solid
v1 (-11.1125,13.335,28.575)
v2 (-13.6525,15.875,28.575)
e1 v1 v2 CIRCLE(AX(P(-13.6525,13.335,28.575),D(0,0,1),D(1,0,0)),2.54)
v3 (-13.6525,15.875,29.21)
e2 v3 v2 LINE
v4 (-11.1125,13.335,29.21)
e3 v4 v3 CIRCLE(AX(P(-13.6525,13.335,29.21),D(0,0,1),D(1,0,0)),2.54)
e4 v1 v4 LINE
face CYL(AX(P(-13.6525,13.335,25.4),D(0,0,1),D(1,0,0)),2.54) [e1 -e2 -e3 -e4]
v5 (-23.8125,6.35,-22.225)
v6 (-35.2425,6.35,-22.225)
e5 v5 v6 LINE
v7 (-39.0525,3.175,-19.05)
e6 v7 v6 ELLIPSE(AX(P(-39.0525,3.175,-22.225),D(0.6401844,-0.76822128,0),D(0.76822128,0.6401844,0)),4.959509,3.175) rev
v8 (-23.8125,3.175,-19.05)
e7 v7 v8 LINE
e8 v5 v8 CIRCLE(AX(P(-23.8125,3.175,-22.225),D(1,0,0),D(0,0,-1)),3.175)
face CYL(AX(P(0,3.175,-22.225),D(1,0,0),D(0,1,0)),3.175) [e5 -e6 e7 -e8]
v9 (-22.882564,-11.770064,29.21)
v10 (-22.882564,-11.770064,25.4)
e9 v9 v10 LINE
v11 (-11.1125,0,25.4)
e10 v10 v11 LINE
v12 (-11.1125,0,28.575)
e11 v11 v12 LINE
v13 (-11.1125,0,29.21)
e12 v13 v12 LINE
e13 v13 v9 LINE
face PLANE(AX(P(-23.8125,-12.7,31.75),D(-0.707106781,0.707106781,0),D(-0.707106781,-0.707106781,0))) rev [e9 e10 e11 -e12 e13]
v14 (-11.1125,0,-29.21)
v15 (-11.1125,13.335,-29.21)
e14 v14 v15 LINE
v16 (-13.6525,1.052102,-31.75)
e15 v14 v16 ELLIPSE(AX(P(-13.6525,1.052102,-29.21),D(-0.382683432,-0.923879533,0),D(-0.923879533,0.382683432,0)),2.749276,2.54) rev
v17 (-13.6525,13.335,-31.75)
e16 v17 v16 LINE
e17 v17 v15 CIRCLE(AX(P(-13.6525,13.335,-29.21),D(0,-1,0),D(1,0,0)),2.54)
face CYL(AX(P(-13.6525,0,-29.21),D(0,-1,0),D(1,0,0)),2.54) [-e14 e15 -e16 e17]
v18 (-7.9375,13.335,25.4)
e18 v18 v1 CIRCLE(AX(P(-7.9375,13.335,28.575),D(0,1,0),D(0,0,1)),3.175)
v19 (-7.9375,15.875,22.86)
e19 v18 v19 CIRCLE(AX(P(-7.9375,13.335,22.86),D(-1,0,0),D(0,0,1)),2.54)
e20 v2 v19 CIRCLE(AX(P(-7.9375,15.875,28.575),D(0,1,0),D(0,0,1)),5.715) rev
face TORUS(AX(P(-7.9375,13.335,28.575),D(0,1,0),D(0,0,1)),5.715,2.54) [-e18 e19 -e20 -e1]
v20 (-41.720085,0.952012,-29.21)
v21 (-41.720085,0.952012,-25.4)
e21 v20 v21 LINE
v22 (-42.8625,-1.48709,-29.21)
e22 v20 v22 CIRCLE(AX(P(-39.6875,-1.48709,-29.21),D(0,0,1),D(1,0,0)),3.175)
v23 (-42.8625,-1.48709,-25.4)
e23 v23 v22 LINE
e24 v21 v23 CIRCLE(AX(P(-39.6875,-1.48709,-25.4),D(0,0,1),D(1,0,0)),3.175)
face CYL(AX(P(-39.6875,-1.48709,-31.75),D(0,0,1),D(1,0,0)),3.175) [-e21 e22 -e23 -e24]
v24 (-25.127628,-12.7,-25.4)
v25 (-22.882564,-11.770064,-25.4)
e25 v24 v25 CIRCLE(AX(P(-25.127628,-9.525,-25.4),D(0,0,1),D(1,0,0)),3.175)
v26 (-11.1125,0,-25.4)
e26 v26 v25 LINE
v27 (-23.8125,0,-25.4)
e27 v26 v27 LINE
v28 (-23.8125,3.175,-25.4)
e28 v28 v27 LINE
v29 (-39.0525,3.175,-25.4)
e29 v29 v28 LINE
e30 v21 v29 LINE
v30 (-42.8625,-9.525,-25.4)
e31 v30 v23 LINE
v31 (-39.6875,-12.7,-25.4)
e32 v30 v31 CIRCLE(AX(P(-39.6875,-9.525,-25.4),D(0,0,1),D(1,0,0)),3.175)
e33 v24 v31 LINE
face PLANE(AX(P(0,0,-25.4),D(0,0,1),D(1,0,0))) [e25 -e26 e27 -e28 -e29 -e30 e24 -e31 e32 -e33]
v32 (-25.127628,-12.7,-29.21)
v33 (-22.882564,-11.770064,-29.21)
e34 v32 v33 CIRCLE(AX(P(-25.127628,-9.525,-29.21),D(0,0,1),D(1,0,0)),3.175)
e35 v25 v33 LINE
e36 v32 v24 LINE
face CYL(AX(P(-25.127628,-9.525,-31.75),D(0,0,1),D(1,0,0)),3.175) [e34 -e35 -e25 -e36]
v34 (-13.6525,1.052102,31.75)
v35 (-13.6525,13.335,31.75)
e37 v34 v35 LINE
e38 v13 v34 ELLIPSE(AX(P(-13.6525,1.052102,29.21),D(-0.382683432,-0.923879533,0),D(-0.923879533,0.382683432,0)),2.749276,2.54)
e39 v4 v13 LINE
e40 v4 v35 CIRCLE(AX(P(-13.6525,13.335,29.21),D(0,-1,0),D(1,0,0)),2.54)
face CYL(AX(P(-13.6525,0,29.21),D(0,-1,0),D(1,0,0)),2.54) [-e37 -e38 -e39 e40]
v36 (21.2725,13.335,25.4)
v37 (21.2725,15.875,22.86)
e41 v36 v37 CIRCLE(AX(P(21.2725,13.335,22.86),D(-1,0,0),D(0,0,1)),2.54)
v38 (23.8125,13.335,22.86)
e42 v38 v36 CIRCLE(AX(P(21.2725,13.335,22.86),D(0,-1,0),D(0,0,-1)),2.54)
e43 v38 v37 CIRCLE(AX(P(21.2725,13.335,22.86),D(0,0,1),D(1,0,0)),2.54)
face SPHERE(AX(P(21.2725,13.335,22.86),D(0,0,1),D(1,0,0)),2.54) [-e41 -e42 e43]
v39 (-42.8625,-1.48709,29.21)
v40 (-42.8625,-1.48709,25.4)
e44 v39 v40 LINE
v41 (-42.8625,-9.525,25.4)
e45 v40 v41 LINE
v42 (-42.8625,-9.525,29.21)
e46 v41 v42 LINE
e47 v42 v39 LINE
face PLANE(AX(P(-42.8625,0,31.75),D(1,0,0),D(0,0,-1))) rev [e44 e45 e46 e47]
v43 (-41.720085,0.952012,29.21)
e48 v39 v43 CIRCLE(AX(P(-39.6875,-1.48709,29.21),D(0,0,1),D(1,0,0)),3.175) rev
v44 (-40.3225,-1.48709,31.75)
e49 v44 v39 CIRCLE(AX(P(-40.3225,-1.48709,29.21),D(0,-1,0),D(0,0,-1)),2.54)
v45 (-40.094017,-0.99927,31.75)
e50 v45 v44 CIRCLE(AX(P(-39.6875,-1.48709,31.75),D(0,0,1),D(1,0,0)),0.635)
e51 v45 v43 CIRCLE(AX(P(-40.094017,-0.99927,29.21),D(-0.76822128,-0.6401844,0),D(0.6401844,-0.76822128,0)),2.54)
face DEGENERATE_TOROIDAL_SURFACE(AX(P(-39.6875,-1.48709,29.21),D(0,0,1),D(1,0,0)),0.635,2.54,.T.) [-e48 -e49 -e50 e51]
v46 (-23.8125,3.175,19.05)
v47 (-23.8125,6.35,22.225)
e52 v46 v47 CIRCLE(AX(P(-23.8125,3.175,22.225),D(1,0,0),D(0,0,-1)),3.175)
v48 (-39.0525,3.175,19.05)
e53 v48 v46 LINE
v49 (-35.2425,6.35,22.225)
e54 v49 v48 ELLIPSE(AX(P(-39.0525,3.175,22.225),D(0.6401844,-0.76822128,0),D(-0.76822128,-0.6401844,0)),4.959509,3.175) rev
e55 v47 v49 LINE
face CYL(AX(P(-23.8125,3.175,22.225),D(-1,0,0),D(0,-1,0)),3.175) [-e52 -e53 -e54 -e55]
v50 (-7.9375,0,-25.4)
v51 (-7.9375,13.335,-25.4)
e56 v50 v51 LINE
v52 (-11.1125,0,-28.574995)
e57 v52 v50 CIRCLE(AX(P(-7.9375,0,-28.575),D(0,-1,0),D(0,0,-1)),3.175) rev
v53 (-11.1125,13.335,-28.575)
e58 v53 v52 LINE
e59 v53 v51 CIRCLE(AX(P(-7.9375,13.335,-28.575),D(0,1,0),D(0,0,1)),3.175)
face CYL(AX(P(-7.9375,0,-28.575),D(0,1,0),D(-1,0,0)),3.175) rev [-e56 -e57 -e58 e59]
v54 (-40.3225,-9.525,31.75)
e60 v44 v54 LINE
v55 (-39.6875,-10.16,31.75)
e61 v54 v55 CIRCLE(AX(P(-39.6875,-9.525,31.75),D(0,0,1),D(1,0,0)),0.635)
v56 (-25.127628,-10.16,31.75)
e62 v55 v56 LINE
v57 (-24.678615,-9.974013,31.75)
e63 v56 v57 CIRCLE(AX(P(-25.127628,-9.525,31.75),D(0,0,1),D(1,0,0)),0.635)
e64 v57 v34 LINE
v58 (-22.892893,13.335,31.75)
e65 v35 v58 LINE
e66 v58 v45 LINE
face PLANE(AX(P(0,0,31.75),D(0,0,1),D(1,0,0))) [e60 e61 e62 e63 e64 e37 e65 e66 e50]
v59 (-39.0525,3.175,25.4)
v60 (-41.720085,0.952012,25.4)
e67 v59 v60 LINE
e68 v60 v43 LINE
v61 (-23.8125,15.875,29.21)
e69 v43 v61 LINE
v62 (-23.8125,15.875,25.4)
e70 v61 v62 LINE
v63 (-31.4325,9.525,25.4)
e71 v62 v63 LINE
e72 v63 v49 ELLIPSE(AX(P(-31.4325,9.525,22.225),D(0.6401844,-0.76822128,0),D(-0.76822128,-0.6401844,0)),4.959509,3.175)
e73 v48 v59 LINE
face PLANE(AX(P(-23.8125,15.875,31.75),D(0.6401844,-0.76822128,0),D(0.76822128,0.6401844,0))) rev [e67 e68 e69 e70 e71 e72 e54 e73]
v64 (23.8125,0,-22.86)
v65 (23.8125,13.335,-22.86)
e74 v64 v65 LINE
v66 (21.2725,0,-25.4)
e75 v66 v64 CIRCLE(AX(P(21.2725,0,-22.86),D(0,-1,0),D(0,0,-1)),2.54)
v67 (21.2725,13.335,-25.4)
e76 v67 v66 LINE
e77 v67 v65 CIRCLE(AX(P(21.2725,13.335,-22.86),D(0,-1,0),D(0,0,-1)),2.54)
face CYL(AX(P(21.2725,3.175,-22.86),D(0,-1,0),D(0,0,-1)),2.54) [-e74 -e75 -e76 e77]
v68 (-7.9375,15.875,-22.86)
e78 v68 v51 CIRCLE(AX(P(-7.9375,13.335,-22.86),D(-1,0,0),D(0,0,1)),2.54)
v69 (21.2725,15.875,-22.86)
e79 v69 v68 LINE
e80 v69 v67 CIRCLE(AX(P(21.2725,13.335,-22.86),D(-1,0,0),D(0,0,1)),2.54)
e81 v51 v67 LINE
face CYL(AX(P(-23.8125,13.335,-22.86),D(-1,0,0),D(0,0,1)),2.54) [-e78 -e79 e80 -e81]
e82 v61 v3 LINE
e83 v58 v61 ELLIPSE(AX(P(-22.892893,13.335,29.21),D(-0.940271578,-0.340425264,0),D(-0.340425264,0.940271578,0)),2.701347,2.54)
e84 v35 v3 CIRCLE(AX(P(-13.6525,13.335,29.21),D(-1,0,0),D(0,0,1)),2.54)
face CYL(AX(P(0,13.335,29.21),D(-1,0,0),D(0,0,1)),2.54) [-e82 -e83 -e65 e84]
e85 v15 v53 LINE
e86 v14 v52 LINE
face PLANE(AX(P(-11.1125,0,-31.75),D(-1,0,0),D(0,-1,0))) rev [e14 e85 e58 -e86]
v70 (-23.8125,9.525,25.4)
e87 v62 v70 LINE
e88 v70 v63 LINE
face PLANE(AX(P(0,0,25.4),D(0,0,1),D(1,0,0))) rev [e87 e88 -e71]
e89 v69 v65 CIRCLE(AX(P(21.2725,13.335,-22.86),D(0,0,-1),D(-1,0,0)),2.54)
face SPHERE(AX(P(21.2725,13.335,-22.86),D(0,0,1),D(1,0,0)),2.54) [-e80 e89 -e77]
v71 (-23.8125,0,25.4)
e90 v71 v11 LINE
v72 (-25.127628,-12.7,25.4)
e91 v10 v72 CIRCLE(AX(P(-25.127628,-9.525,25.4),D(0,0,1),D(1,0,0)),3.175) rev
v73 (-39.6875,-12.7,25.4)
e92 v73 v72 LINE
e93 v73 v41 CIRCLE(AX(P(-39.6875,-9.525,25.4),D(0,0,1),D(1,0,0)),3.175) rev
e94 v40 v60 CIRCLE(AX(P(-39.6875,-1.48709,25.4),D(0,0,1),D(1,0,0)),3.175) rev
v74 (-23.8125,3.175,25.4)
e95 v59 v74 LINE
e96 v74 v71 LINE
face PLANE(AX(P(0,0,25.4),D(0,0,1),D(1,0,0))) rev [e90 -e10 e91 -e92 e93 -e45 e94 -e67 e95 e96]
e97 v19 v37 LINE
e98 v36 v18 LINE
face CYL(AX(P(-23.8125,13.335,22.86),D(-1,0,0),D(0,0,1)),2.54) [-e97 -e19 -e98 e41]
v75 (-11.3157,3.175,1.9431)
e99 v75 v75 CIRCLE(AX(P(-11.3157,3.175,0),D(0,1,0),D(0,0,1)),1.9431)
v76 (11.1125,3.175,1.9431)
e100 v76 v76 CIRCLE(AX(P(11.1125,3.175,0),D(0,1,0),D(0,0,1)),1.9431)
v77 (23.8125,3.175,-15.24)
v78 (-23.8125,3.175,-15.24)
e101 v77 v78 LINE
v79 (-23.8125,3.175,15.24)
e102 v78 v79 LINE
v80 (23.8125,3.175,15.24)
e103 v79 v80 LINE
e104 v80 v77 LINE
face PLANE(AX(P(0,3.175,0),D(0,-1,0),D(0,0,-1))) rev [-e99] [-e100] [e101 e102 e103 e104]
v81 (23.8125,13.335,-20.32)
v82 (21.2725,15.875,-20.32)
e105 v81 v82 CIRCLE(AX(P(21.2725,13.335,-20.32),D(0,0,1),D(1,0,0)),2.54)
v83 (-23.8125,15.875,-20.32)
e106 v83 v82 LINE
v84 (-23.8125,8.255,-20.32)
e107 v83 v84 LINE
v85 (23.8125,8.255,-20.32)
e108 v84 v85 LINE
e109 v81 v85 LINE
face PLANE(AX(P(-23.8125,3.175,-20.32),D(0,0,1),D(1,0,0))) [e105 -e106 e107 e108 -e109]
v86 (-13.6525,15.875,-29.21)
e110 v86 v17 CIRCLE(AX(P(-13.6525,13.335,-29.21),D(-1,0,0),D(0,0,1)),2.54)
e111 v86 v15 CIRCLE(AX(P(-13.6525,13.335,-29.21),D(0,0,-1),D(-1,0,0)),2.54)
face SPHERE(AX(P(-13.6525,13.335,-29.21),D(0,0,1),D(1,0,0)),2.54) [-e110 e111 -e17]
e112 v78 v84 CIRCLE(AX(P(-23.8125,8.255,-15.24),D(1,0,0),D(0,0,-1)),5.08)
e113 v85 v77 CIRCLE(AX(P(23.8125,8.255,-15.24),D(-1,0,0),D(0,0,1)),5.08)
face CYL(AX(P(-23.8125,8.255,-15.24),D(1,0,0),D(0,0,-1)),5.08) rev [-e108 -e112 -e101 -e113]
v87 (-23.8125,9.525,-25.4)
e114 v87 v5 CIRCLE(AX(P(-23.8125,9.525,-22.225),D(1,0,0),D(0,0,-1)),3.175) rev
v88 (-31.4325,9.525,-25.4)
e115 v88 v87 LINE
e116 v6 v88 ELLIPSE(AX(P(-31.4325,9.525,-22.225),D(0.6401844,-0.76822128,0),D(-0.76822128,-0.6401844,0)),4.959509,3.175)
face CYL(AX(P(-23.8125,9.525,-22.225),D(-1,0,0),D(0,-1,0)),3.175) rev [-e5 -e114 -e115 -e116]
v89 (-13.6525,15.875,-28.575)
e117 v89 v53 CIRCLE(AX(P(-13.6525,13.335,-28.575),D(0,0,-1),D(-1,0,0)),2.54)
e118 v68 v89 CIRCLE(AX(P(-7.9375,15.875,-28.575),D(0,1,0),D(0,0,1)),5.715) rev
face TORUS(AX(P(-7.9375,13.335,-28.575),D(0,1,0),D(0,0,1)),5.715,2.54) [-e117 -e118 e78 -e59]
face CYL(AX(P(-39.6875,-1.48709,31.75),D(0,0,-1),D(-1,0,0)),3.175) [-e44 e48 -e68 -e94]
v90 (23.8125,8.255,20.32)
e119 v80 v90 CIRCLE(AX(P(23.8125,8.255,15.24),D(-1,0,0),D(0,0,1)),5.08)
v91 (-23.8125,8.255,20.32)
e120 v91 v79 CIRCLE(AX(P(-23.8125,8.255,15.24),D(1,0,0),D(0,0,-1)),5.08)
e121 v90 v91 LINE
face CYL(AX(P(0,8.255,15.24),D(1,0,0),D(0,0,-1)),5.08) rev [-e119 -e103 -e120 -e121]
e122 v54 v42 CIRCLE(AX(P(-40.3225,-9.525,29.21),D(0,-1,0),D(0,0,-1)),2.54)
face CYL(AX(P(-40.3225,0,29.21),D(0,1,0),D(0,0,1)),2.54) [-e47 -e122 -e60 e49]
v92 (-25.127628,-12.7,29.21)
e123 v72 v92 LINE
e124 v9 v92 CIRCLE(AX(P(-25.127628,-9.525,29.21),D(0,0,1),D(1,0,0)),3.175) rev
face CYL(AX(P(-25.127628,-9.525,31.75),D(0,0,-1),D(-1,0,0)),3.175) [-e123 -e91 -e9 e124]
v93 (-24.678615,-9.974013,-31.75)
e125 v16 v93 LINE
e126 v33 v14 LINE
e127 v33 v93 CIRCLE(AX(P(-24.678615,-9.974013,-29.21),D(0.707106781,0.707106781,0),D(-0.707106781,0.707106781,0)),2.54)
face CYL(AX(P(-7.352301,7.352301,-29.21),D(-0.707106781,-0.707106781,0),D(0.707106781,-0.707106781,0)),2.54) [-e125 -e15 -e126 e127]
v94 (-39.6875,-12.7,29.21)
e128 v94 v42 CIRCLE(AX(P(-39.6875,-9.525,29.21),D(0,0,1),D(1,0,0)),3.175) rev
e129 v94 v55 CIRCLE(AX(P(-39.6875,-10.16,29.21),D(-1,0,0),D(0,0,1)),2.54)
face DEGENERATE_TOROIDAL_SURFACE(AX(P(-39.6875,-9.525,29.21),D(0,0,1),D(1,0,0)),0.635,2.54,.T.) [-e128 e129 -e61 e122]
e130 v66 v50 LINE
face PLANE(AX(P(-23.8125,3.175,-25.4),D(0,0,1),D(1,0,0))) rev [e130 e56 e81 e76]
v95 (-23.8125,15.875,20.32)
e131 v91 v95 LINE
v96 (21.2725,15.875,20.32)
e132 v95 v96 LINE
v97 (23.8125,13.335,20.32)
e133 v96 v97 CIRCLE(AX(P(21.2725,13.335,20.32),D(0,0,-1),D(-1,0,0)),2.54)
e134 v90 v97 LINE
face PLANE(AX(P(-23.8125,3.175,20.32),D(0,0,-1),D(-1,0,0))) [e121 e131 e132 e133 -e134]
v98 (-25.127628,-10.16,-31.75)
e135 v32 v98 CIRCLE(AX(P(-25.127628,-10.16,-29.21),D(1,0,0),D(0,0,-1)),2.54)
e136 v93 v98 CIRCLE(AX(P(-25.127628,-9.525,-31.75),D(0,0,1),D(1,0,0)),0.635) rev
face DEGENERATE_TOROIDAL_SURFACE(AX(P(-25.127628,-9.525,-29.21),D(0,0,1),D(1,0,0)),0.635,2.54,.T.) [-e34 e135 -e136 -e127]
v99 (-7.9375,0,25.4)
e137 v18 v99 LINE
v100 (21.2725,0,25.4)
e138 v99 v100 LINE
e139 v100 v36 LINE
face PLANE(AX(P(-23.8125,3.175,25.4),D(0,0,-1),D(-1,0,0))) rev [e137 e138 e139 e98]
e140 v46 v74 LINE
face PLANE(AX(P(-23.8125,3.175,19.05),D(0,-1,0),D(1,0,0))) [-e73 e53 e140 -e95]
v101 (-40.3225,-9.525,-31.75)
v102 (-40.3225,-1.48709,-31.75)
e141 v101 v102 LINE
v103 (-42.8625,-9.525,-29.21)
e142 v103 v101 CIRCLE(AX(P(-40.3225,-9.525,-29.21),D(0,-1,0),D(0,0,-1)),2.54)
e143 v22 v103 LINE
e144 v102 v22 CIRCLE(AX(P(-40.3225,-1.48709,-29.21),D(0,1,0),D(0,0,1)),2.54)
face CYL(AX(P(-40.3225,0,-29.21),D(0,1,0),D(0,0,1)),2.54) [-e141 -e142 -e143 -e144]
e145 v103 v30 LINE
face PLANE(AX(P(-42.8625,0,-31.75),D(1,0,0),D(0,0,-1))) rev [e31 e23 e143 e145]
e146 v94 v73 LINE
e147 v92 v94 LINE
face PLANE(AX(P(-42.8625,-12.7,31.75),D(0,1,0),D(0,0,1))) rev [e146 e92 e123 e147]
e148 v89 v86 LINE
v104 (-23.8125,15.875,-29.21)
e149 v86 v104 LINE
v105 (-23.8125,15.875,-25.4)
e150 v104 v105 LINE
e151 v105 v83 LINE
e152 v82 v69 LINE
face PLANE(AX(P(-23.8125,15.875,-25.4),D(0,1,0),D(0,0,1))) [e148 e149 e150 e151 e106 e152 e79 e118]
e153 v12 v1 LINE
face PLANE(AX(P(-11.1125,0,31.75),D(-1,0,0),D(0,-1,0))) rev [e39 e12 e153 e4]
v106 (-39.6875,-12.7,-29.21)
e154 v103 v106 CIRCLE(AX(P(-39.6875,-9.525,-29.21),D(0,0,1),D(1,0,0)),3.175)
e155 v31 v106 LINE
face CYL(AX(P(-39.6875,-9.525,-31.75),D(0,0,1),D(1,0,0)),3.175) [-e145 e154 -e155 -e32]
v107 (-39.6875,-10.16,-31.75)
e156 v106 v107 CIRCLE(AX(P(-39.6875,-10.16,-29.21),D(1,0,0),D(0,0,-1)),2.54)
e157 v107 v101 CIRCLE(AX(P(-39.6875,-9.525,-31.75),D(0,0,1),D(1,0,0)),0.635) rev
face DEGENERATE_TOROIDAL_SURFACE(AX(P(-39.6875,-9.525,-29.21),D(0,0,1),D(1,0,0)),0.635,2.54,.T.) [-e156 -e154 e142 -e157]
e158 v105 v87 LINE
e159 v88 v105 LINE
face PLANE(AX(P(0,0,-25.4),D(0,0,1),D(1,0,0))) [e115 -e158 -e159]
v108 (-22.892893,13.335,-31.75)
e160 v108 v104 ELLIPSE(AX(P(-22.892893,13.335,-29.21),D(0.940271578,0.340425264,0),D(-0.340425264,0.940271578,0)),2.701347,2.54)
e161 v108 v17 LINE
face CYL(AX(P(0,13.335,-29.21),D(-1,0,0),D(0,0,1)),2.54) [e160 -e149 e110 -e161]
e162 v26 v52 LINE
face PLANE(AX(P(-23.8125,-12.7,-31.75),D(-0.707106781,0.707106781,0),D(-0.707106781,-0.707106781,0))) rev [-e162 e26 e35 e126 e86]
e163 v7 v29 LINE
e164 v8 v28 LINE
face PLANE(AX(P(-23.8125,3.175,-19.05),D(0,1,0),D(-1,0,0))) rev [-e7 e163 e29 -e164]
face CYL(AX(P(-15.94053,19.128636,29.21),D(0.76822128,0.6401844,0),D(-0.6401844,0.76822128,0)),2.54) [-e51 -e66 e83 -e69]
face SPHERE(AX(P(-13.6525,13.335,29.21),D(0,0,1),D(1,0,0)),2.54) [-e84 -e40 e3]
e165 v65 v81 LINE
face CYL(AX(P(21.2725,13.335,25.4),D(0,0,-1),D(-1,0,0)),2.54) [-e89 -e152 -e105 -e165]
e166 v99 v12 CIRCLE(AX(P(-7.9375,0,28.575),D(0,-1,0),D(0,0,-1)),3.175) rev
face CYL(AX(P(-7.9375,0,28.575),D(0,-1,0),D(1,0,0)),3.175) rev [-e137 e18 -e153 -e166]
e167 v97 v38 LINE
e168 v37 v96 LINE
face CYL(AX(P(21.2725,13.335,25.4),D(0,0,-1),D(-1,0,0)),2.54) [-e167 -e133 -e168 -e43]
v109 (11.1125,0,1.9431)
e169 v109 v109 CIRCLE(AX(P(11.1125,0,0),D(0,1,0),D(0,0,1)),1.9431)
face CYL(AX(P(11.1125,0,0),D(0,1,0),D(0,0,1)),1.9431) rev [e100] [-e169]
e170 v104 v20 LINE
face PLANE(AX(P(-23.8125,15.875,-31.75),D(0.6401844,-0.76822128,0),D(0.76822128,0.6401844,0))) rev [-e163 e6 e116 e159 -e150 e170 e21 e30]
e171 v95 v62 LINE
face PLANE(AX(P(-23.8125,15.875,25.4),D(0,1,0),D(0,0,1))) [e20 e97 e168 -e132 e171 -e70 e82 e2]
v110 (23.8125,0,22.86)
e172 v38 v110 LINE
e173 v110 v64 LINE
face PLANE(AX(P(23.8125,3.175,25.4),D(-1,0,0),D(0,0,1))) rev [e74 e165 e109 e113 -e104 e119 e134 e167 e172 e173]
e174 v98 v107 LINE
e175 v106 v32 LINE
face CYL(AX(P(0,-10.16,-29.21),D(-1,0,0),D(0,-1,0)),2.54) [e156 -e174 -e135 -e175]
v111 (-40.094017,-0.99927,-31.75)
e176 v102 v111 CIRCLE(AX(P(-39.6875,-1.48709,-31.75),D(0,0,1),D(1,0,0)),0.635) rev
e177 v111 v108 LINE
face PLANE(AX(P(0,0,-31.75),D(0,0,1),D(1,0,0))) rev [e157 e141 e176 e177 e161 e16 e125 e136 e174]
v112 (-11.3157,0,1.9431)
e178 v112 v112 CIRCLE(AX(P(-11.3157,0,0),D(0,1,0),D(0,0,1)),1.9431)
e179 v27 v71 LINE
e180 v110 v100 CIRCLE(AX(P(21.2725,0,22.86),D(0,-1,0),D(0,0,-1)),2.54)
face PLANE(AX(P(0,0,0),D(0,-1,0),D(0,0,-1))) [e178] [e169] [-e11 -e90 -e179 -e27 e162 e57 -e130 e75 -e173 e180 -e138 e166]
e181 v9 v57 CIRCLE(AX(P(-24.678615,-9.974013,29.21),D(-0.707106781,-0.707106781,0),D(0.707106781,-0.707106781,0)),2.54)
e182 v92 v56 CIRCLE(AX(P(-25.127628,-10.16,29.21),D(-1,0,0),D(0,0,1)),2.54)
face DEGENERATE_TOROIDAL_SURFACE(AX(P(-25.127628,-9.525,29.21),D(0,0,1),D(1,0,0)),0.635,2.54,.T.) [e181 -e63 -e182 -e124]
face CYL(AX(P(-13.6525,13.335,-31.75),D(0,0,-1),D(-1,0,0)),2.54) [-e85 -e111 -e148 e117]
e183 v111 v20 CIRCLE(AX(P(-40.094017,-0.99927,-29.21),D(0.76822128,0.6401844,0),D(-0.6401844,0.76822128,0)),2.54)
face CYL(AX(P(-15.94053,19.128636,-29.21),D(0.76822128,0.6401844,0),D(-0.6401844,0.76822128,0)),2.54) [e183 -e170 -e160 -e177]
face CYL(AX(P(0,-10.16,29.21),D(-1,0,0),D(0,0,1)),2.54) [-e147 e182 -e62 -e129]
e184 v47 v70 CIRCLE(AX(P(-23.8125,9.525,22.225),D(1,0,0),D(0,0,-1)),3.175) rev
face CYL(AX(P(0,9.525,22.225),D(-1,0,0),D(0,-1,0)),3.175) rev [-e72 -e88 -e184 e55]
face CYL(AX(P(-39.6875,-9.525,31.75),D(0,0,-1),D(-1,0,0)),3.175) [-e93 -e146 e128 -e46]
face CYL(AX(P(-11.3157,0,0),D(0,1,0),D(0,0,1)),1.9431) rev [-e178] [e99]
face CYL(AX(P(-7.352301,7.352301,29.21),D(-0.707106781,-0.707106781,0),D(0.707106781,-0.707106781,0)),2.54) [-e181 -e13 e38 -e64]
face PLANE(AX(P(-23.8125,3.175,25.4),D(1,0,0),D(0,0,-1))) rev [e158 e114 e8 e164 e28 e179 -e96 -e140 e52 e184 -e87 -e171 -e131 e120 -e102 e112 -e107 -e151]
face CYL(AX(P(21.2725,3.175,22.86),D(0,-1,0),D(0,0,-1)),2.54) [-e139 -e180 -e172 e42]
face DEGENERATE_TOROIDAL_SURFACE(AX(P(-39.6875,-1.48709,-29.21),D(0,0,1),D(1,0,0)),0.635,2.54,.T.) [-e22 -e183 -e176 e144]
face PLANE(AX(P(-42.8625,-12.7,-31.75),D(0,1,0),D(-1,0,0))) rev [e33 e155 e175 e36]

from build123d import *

# Parameters (mm, degrees)
SKETCH1_W           = 47.625
SKETCH1_H           = 50.8
BOSS_EXTRUDE1_DEPTH = 3.175
SKETCH2_R           = 1.9431
CUT_EXTRUDE1_DEPTH  = 35.961060929
SKETCH3_W           = 5.08
SKETCH3_H           = 12.7
BOSS_EXTRUDE2_DEPTH = 47.625
FILLET1_R           = 5.08
BOSS_EXTRUDE4_DEPTH = 6.35
FILLET4_R           = 3.175
BOSS_EXTRUDE5_DEPTH = 6.35
FILLET6_R           = 3.175
BOSS_EXTRUDE6_DEPTH = 6.35
FILLET8_R           = 3.175
FILLET9_R           = 3.175
FILLET10_R          = 2.54
FILLET11_R          = 2.54
FILLET12_R          = 2.54


with BuildPart() as part:
    # Sketch1 → Boss-Extrude1 (new body)
    with BuildSketch(Plane(origin=(0, 0, 0), x_dir=(1, 0, 0), z_dir=(0, 1, 0))):
        Rectangle(SKETCH1_W, SKETCH1_H)
    extrude(amount=BOSS_EXTRUDE1_DEPTH)

    # Sketch2 → Cut-Extrude1 (cut, through all)
    with BuildSketch(Plane(origin=(0, 3.175, 0), x_dir=(1, 0, 0), z_dir=(0, 1, 0))):
        with Locations(Location((11.1125, 0, 0), (0, 0, 270))):
            Circle(SKETCH2_R)
        with Locations(Location((-11.3157, 0, 0), (0, 0, 270))):
            Circle(SKETCH2_R)
    extrude(amount=-CUT_EXTRUDE1_DEPTH, mode=Mode.SUBTRACT)

    # Sketch3 → Boss-Extrude2 (add)
    with BuildSketch(Plane(origin=(23.8125, 0, 0), x_dir=(0, 0, -1), z_dir=(1, 0, 0))):
        with Locations((-22.86, 9.525)):
            Rectangle(SKETCH3_W, SKETCH3_H)
        with Locations((22.86, 9.525)):
            Rectangle(SKETCH3_W, SKETCH3_H)
    extrude(amount=-BOSS_EXTRUDE2_DEPTH)

    # Fillet1
    fillet1_edges = [part.edges().sort_by_distance(p)[0] for p in [
        (0, 3.175, 20.32),
        (0, 3.175, -20.32),
    ]]
    fillet(fillet1_edges, radius=FILLET1_R)

    # Sketch5 → Boss-Extrude4 (add)
    with BuildSketch(Plane(origin=(0, 0, -25.4), x_dir=(-1, 0, 0), z_dir=(0, 0, -1))):
        Polygon((11.1125, 15.875), (23.8125, 15.875), (42.8625, 0), (42.8625, -12.7), (23.8125, -12.7), (11.1125, 0), align=None)
    extrude(amount=BOSS_EXTRUDE4_DEPTH)

    # Fillet4
    # the kernel refuses this fillet: 3.175 mm, written as the material it adds along each edge
    with BuildSketch(Plane(origin=(-11.1125, 0, -25.4), x_dir=(1, 0, 0), z_dir=(0, 1, 0))) as fillet4_piece_1:
        with BuildLine():
            CenterArc((FILLET4_R, FILLET4_R), FILLET4_R, 180, 90)
            Line((0, FILLET4_R), (0, 0))
            Line((0, 0), (FILLET4_R, 0))
        make_face()
    extrude(amount=15.875)
    # the kernel refuses this fillet: 3.175 mm, written as the material it takes off along each edge
    with BuildSketch(Plane(origin=(-23.8125, -12.7, -22.112179849), x_dir=(0.7071067811865468, 0.7071067811865482, 0), z_dir=(0, 0, -1))) as fillet4_2_piece_1:
        with BuildLine():
            CenterArc((FILLET4_R * 0.414213562373, -FILLET4_R), FILLET4_R, 90, 45)
            Line((-FILLET4_R * 0.292893218813, -FILLET4_R * 0.292893218813), (0, 0))
            Line((0, 0), (FILLET4_R * 0.414213562373, 0))
        make_face()
    extrude(amount=12.925640303, mode=Mode.SUBTRACT)
    with BuildSketch(Plane(origin=(-42.8625, -12.7, -17.4625), x_dir=(1, 0, 0), z_dir=(0, 0, -1))) as fillet4_2_piece_2:
        with BuildLine():
            CenterArc((FILLET4_R, -FILLET4_R), FILLET4_R, 90, 90)
            Line((0, -FILLET4_R), (0, 0))
            Line((0, 0), (FILLET4_R, 0))
        make_face()
    extrude(amount=22.225, mode=Mode.SUBTRACT)
    with BuildSketch(Plane(origin=(-42.8625, 0, -21.682273866), x_dir=(0.7682212795973764, 0.6401843996644792, 0), z_dir=(0, 0, -1))) as fillet4_2_piece_3:
        with BuildLine():
            CenterArc((FILLET4_R * 0.468374945984, FILLET4_R), FILLET4_R, 219.805571092, 50.194428908)
            Line((-FILLET4_R * 0.299846333613, FILLET4_R * 0.359815600336), (0, 0))
            Line((0, 0), (FILLET4_R * 0.468374945984, 0))
        make_face()
    extrude(amount=13.785452268, mode=Mode.SUBTRACT)

    # Sketch6 → Boss-Extrude5 (add)
    with BuildSketch(Plane.XY.offset(25.4)):
        Polygon((-11.1125, 15.875), (-23.8125, 15.875), (-42.8625, 0), (-42.8625, -12.7), (-23.8125, -12.7), (-11.1125, 0), align=None)
    extrude(amount=BOSS_EXTRUDE5_DEPTH)

    # Fillet6
    # the kernel refuses this fillet: 3.175 mm, written as the material it adds along each edge
    with BuildSketch(Plane(origin=(-11.1125, 0, 25.4), x_dir=(1, 0, 0), z_dir=(0, 1, 0))) as fillet6_piece_1:
        with BuildLine():
            CenterArc((FILLET6_R, -FILLET6_R), FILLET6_R, 90, 90)
            Line((0, -FILLET6_R), (0, 0))
            Line((0, 0), (FILLET6_R, 0))
        make_face()
    extrude(amount=15.875)
    # the kernel refuses this fillet: 3.175 mm, written as the material it takes off along each edge
    with BuildSketch(Plane(origin=(-42.8625, 0, 21.682273866), x_dir=(0, -1, 0), z_dir=(0, 0, 1))) as fillet6_2_piece_1:
        with BuildLine():
            CenterArc((FILLET6_R * 0.468374945984, FILLET6_R), FILLET6_R, 219.805571092, 50.194428908)
            Line((-FILLET6_R * 0.299846333613, FILLET6_R * 0.359815600336), (0, 0))
            Line((0, 0), (FILLET6_R * 0.468374945984, 0))
        make_face()
    extrude(amount=13.785452268, mode=Mode.SUBTRACT)
    with BuildSketch(Plane(origin=(-42.8625, -12.7, 17.4625), x_dir=(1, 0, 0), z_dir=(0, 0, 1))) as fillet6_2_piece_2:
        with BuildLine():
            CenterArc((FILLET6_R, FILLET6_R), FILLET6_R, 180, 90)
            Line((0, FILLET6_R), (0, 0))
            Line((0, 0), (FILLET6_R, 0))
        make_face()
    extrude(amount=22.225, mode=Mode.SUBTRACT)
    with BuildSketch(Plane(origin=(-23.8125, -12.7, 22.112179849), x_dir=(0.7071067811865468, 0.7071067811865482, 0), z_dir=(0, 0, 1))) as fillet6_2_piece_3:
        with BuildLine():
            CenterArc((FILLET6_R * 0.414213562373, FILLET6_R), FILLET6_R, 225, 45)
            Line((-FILLET6_R * 0.292893218813, FILLET6_R * 0.292893218813), (0, 0))
            Line((0, 0), (FILLET6_R * 0.414213562373, 0))
        make_face()
    extrude(amount=12.925640303, mode=Mode.SUBTRACT)

    # Sketch7 → Boss-Extrude6 (add)
    with BuildSketch(Plane.XY.offset(-25.4)):
        Polygon((-23.8125, 3.175), (-39.0525, 3.175), (-35.2425, 6.35), (-23.8125, 6.35), align=None)
    boss_extrude6 = extrude(amount=BOSS_EXTRUDE6_DEPTH)

    # Fillet8
    # the kernel refuses this fillet: 3.175 mm, written as the material it adds along each edge
    with BuildSketch(Plane(origin=(-43.18, 6.35, -25.4), x_dir=(0, 0, 1), z_dir=(1, 0, 0))) as fillet8_piece_1_section:
        with BuildLine():
            CenterArc((FILLET8_R, -FILLET8_R), FILLET8_R, 90, 90)
            Line((0, -FILLET8_R), (0, 0))
            Line((0, 0), (FILLET8_R, 0))
        make_face()
    fillet8_piece_1 = extrude(amount=27.305, mode=Mode.PRIVATE)
    fillet8_piece_1 = split(fillet8_piece_1, bisect_by=Plane(origin=(-31.306679487, 9.629850427, -24.649765277), z_dir=(0.6401843996644798, -0.768221279597376, 0)), keep=Keep.TOP, mode=Mode.PRIVATE)
    add(fillet8_piece_1)
    # the kernel refuses this fillet: 3.175 mm, written as the material it takes off along each edge
    with BuildSketch(Plane(origin=(-43.18, 6.35, -19.05), x_dir=(0, -1, 0), z_dir=(1, 0, 0))) as fillet8_2_piece_1:
        with BuildLine():
            CenterArc((FILLET8_R, FILLET8_R), FILLET8_R, 180, 90)
            Line((0, FILLET8_R), (0, 0))
            Line((0, 0), (FILLET8_R, 0))
        make_face()
    extrude(amount=19.3675, mode=Mode.SUBTRACT)

    # Mirror5: Boss-Extrude6 across plane
    add(boss_extrude6.mirror(Plane.XY))

    # Fillet9
    # the kernel refuses this fillet: 3.175 mm, written as the material it adds along each edge
    with BuildSketch(Plane(origin=(-43.18, 6.35, 25.4), x_dir=(0, 0, -1), z_dir=(1, 0, 0))) as fillet9_piece_1_section:
        with BuildLine():
            CenterArc((FILLET9_R, FILLET9_R), FILLET9_R, 180, 90)
            Line((0, FILLET9_R), (0, 0))
            Line((0, 0), (FILLET9_R, 0))
        make_face()
    fillet9_piece_1 = extrude(amount=27.305, mode=Mode.PRIVATE)
    fillet9_piece_1 = split(fillet9_piece_1, bisect_by=Plane(origin=(-31.306679487, 9.629850427, 24.649765277), z_dir=(0.6401843996644802, -0.7682212795973757, 0)), keep=Keep.TOP, mode=Mode.PRIVATE)
    add(fillet9_piece_1)
    # the kernel refuses this fillet: 3.175 mm, written as the material it takes off along each edge
    with BuildSketch(Plane(origin=(-43.18, 6.35, 19.05), x_dir=(0, -1, 0), z_dir=(1, 0, 0))) as fillet9_2_piece_1:
        with BuildLine():
            CenterArc((FILLET9_R, -FILLET9_R), FILLET9_R, 90, 90)
            Line((0, -FILLET9_R), (0, 0))
            Line((0, 0), (FILLET9_R, 0))
        make_face()
    extrude(amount=19.3675, mode=Mode.SUBTRACT)

    # Fillet10
    fillet10_edges = [part.edges().sort_by_distance(p)[0] for p in [
        (-11.1125, 7.9375, 31.75),
        (-17.4625, 15.875, 31.75),
        (-32.766292734, 8.413506055, 31.75),
        (-16.997532015, -5.885032015, 31.75),
        (-32.40756403, -12.7, 31.75),
        (-42.8625, -5.506045227, 31.75),
        (-42.562746412, -0.14039707, 31.75),
        (-41.93256403, -11.77006403, 31.75),
        (-23.912608163, -12.458317516, 31.75),
        (-11.1125, 7.9375, -31.75),
        (-16.997532015, -5.885032015, -31.75),
        (-17.4625, 15.875, -31.75),
        (-32.40756403, -12.7, -31.75),
        (-42.8625, -5.506045227, -31.75),
        (-32.766292734, 8.413506055, -31.75),
        (-42.562746412, -0.14039707, -31.75),
        (-41.93256403, -11.77006403, -31.75),
        (-23.912608163, -12.458317516, -31.75),
    ]]
    fillet(fillet10_edges, radius=FILLET10_R)

    # Fillet11
    # the kernel refuses this fillet: 2.54 mm, written as the material it takes off along each edge
    with BuildSketch(Plane(origin=(-13.6525, 13.335, 29.21), x_dir=(1, 0, 0), z_dir=(0, 1, 0))) as fillet11_piece_1_section:
        Polygon((0, 0), (FILLET11_R, 0), (FILLET11_R, -FILLET11_R), (0, -FILLET11_R), align=None)
    fillet11_piece_1 = extrude(amount=FILLET11_R, mode=Mode.PRIVATE)
    fillet11_piece_1 = fillet11_piece_1 - Plane(origin=(-13.6525, 13.335, 29.21), x_dir=(-0.7071067811865475, 0, -0.7071067811865475), z_dir=(0, 1, 0)) * Sphere(FILLET11_R, mode=Mode.PRIVATE)
    add(fillet11_piece_1, mode=Mode.SUBTRACT)
    with BuildSketch(Plane(origin=(-13.6525, 13.335, -29.21), x_dir=(1, 0, 0), z_dir=(0, 1, 0))) as fillet11_piece_2_section:
        Polygon((0, 0), (FILLET11_R, 0), (FILLET11_R, FILLET11_R), (0, FILLET11_R), align=None)
    fillet11_piece_2 = extrude(amount=FILLET11_R, mode=Mode.PRIVATE)
    fillet11_piece_2 = fillet11_piece_2 - Plane(origin=(-13.6525, 13.335, -29.21), x_dir=(-0.7071067811865475, 0, 0.7071067811865475), z_dir=(0, 1, 0)) * Sphere(FILLET11_R, mode=Mode.PRIVATE)
    add(fillet11_piece_2, mode=Mode.SUBTRACT)
    with BuildSketch(Plane(origin=(30.1625, 15.875, 25.4), x_dir=(0, 0, -1), z_dir=(-1, 0, 0))) as fillet11_piece_3:
        with BuildLine():
            CenterArc((FILLET11_R, FILLET11_R), FILLET11_R, 180, 90)
            Line((0, FILLET11_R), (0, 0))
            Line((0, 0), (FILLET11_R, 0))
        make_face()
    extrude(amount=38.1, mode=Mode.SUBTRACT)
    with BuildSketch(Plane(origin=(-7.9375, 15.875, 28.575), x_dir=(0, 0, -1), z_dir=(1, 0, 0))) as fillet11_piece_4:
        with BuildLine():
            CenterArc((3.175 + FILLET11_R, -FILLET11_R), FILLET11_R, 90, 90)
            Line((3.175, -FILLET11_R), (3.175, 0))
            Line((3.175, 0), (3.175 + FILLET11_R, 0))
        make_face()
    revolve(axis=Axis((-7.9375, 15.875, 28.575), (0, 1, 0)), revolution_arc=90, mode=Mode.SUBTRACT)
    with BuildSketch(Plane(origin=(-11.1125, 15.875, 28.575), x_dir=(-1, 0, 0), z_dir=(0, 0, 1))) as fillet11_piece_5:
        with BuildLine():
            CenterArc((FILLET11_R, FILLET11_R), FILLET11_R, 180, 90)
            Line((0, FILLET11_R), (0, 0))
            Line((0, 0), (FILLET11_R, 0))
        make_face()
    extrude(amount=0.635, mode=Mode.SUBTRACT)
    with BuildSketch(Plane(origin=(-11.1125, 15.875, -28.575), x_dir=(-1, 0, 0), z_dir=(0, 0, -1))) as fillet11_piece_6:
        with BuildLine():
            CenterArc((FILLET11_R, -FILLET11_R), FILLET11_R, 90, 90)
            Line((0, -FILLET11_R), (0, 0))
            Line((0, 0), (FILLET11_R, 0))
        make_face()
    extrude(amount=0.635, mode=Mode.SUBTRACT)
    with BuildSketch(Plane(origin=(23.8125, -6.35, 25.4), x_dir=(-1, 0, 0), z_dir=(0, 1, 0)), Plane(origin=(23.8125, -6.35, -25.4), x_dir=(0, 0, 1), z_dir=(0, 1, 0))) as fillet11_piece_7:
        with BuildLine():
            CenterArc((FILLET11_R, -FILLET11_R), FILLET11_R, 90, 90)
            Line((0, -FILLET11_R), (0, 0))
            Line((0, 0), (FILLET11_R, 0))
        make_face()
    extrude(amount=28.575, mode=Mode.SUBTRACT)
    with BuildSketch(Plane(origin=(30.1625, 15.875, -25.4), x_dir=(0, 0, 1), z_dir=(-1, 0, 0))) as fillet11_piece_8:
        with BuildLine():
            CenterArc((FILLET11_R, -FILLET11_R), FILLET11_R, 90, 90)
            Line((0, -FILLET11_R), (0, 0))
            Line((0, 0), (FILLET11_R, 0))
        make_face()
    extrude(amount=38.1, mode=Mode.SUBTRACT)
    with BuildSketch(Plane(origin=(-7.9375, 15.875, -28.575), x_dir=(-1, 0, 0), z_dir=(0, 0, -1))) as fillet11_piece_9:
        with BuildLine():
            CenterArc((3.175 + FILLET11_R, -FILLET11_R), FILLET11_R, 90, 90)
            Line((3.175, -FILLET11_R), (3.175, 0))
            Line((3.175, 0), (3.175 + FILLET11_R, 0))
        make_face()
    revolve(axis=Axis((-7.9375, 15.875, -28.575), (0, 1, 0)), revolution_arc=90, mode=Mode.SUBTRACT)

    # Fillet12
    # the kernel refuses this fillet: 2.54 mm, written as the material it takes off along each edge
    with BuildSketch(Plane(origin=(21.2725, 13.335, 22.86), x_dir=(1, 0, 0), z_dir=(0, 1, 0))) as fillet12_piece_1_section:
        Polygon((0, 0), (FILLET12_R, 0), (FILLET12_R, -FILLET12_R), (0, -FILLET12_R), align=None)
    fillet12_piece_1 = extrude(amount=FILLET12_R, mode=Mode.PRIVATE)
    fillet12_piece_1 = fillet12_piece_1 - Plane(origin=(21.2725, 13.335, 22.86), x_dir=(-0.7071067811865475, 0, -0.7071067811865475), z_dir=(0, 1, 0)) * Sphere(FILLET12_R, mode=Mode.PRIVATE)
    add(fillet12_piece_1, mode=Mode.SUBTRACT)
    with BuildSketch(Plane(origin=(21.2725, 13.335, -22.86), x_dir=(0, 1, 0), z_dir=(1, 0, 0))) as fillet12_piece_2_section:
        Polygon((0, 0), (FILLET12_R, 0), (FILLET12_R, -FILLET12_R), (0, -FILLET12_R), align=None)
    fillet12_piece_2 = extrude(amount=FILLET12_R, mode=Mode.PRIVATE)
    fillet12_piece_2 = fillet12_piece_2 - Plane(origin=(21.2725, 13.335, -22.86), x_dir=(0, -0.7071067811865475, 0.7071067811865475), z_dir=(1, 0, 0)) * Sphere(FILLET12_R, mode=Mode.PRIVATE)
    add(fillet12_piece_2, mode=Mode.SUBTRACT)
    with BuildSketch(Plane(origin=(23.8125, 15.875, 13.97), x_dir=(-1, 0, 0), z_dir=(0, 0, 1)), Plane(origin=(23.8125, 15.875, -13.97), x_dir=(0, -1, 0), z_dir=(0, 0, -1))) as fillet12_piece_3:
        with BuildLine():
            CenterArc((FILLET12_R, FILLET12_R), FILLET12_R, 180, 90)
            Line((0, FILLET12_R), (0, 0))
            Line((0, 0), (FILLET12_R, 0))
        make_face()
    extrude(amount=8.89, mode=Mode.SUBTRACT)


solid = part.part
